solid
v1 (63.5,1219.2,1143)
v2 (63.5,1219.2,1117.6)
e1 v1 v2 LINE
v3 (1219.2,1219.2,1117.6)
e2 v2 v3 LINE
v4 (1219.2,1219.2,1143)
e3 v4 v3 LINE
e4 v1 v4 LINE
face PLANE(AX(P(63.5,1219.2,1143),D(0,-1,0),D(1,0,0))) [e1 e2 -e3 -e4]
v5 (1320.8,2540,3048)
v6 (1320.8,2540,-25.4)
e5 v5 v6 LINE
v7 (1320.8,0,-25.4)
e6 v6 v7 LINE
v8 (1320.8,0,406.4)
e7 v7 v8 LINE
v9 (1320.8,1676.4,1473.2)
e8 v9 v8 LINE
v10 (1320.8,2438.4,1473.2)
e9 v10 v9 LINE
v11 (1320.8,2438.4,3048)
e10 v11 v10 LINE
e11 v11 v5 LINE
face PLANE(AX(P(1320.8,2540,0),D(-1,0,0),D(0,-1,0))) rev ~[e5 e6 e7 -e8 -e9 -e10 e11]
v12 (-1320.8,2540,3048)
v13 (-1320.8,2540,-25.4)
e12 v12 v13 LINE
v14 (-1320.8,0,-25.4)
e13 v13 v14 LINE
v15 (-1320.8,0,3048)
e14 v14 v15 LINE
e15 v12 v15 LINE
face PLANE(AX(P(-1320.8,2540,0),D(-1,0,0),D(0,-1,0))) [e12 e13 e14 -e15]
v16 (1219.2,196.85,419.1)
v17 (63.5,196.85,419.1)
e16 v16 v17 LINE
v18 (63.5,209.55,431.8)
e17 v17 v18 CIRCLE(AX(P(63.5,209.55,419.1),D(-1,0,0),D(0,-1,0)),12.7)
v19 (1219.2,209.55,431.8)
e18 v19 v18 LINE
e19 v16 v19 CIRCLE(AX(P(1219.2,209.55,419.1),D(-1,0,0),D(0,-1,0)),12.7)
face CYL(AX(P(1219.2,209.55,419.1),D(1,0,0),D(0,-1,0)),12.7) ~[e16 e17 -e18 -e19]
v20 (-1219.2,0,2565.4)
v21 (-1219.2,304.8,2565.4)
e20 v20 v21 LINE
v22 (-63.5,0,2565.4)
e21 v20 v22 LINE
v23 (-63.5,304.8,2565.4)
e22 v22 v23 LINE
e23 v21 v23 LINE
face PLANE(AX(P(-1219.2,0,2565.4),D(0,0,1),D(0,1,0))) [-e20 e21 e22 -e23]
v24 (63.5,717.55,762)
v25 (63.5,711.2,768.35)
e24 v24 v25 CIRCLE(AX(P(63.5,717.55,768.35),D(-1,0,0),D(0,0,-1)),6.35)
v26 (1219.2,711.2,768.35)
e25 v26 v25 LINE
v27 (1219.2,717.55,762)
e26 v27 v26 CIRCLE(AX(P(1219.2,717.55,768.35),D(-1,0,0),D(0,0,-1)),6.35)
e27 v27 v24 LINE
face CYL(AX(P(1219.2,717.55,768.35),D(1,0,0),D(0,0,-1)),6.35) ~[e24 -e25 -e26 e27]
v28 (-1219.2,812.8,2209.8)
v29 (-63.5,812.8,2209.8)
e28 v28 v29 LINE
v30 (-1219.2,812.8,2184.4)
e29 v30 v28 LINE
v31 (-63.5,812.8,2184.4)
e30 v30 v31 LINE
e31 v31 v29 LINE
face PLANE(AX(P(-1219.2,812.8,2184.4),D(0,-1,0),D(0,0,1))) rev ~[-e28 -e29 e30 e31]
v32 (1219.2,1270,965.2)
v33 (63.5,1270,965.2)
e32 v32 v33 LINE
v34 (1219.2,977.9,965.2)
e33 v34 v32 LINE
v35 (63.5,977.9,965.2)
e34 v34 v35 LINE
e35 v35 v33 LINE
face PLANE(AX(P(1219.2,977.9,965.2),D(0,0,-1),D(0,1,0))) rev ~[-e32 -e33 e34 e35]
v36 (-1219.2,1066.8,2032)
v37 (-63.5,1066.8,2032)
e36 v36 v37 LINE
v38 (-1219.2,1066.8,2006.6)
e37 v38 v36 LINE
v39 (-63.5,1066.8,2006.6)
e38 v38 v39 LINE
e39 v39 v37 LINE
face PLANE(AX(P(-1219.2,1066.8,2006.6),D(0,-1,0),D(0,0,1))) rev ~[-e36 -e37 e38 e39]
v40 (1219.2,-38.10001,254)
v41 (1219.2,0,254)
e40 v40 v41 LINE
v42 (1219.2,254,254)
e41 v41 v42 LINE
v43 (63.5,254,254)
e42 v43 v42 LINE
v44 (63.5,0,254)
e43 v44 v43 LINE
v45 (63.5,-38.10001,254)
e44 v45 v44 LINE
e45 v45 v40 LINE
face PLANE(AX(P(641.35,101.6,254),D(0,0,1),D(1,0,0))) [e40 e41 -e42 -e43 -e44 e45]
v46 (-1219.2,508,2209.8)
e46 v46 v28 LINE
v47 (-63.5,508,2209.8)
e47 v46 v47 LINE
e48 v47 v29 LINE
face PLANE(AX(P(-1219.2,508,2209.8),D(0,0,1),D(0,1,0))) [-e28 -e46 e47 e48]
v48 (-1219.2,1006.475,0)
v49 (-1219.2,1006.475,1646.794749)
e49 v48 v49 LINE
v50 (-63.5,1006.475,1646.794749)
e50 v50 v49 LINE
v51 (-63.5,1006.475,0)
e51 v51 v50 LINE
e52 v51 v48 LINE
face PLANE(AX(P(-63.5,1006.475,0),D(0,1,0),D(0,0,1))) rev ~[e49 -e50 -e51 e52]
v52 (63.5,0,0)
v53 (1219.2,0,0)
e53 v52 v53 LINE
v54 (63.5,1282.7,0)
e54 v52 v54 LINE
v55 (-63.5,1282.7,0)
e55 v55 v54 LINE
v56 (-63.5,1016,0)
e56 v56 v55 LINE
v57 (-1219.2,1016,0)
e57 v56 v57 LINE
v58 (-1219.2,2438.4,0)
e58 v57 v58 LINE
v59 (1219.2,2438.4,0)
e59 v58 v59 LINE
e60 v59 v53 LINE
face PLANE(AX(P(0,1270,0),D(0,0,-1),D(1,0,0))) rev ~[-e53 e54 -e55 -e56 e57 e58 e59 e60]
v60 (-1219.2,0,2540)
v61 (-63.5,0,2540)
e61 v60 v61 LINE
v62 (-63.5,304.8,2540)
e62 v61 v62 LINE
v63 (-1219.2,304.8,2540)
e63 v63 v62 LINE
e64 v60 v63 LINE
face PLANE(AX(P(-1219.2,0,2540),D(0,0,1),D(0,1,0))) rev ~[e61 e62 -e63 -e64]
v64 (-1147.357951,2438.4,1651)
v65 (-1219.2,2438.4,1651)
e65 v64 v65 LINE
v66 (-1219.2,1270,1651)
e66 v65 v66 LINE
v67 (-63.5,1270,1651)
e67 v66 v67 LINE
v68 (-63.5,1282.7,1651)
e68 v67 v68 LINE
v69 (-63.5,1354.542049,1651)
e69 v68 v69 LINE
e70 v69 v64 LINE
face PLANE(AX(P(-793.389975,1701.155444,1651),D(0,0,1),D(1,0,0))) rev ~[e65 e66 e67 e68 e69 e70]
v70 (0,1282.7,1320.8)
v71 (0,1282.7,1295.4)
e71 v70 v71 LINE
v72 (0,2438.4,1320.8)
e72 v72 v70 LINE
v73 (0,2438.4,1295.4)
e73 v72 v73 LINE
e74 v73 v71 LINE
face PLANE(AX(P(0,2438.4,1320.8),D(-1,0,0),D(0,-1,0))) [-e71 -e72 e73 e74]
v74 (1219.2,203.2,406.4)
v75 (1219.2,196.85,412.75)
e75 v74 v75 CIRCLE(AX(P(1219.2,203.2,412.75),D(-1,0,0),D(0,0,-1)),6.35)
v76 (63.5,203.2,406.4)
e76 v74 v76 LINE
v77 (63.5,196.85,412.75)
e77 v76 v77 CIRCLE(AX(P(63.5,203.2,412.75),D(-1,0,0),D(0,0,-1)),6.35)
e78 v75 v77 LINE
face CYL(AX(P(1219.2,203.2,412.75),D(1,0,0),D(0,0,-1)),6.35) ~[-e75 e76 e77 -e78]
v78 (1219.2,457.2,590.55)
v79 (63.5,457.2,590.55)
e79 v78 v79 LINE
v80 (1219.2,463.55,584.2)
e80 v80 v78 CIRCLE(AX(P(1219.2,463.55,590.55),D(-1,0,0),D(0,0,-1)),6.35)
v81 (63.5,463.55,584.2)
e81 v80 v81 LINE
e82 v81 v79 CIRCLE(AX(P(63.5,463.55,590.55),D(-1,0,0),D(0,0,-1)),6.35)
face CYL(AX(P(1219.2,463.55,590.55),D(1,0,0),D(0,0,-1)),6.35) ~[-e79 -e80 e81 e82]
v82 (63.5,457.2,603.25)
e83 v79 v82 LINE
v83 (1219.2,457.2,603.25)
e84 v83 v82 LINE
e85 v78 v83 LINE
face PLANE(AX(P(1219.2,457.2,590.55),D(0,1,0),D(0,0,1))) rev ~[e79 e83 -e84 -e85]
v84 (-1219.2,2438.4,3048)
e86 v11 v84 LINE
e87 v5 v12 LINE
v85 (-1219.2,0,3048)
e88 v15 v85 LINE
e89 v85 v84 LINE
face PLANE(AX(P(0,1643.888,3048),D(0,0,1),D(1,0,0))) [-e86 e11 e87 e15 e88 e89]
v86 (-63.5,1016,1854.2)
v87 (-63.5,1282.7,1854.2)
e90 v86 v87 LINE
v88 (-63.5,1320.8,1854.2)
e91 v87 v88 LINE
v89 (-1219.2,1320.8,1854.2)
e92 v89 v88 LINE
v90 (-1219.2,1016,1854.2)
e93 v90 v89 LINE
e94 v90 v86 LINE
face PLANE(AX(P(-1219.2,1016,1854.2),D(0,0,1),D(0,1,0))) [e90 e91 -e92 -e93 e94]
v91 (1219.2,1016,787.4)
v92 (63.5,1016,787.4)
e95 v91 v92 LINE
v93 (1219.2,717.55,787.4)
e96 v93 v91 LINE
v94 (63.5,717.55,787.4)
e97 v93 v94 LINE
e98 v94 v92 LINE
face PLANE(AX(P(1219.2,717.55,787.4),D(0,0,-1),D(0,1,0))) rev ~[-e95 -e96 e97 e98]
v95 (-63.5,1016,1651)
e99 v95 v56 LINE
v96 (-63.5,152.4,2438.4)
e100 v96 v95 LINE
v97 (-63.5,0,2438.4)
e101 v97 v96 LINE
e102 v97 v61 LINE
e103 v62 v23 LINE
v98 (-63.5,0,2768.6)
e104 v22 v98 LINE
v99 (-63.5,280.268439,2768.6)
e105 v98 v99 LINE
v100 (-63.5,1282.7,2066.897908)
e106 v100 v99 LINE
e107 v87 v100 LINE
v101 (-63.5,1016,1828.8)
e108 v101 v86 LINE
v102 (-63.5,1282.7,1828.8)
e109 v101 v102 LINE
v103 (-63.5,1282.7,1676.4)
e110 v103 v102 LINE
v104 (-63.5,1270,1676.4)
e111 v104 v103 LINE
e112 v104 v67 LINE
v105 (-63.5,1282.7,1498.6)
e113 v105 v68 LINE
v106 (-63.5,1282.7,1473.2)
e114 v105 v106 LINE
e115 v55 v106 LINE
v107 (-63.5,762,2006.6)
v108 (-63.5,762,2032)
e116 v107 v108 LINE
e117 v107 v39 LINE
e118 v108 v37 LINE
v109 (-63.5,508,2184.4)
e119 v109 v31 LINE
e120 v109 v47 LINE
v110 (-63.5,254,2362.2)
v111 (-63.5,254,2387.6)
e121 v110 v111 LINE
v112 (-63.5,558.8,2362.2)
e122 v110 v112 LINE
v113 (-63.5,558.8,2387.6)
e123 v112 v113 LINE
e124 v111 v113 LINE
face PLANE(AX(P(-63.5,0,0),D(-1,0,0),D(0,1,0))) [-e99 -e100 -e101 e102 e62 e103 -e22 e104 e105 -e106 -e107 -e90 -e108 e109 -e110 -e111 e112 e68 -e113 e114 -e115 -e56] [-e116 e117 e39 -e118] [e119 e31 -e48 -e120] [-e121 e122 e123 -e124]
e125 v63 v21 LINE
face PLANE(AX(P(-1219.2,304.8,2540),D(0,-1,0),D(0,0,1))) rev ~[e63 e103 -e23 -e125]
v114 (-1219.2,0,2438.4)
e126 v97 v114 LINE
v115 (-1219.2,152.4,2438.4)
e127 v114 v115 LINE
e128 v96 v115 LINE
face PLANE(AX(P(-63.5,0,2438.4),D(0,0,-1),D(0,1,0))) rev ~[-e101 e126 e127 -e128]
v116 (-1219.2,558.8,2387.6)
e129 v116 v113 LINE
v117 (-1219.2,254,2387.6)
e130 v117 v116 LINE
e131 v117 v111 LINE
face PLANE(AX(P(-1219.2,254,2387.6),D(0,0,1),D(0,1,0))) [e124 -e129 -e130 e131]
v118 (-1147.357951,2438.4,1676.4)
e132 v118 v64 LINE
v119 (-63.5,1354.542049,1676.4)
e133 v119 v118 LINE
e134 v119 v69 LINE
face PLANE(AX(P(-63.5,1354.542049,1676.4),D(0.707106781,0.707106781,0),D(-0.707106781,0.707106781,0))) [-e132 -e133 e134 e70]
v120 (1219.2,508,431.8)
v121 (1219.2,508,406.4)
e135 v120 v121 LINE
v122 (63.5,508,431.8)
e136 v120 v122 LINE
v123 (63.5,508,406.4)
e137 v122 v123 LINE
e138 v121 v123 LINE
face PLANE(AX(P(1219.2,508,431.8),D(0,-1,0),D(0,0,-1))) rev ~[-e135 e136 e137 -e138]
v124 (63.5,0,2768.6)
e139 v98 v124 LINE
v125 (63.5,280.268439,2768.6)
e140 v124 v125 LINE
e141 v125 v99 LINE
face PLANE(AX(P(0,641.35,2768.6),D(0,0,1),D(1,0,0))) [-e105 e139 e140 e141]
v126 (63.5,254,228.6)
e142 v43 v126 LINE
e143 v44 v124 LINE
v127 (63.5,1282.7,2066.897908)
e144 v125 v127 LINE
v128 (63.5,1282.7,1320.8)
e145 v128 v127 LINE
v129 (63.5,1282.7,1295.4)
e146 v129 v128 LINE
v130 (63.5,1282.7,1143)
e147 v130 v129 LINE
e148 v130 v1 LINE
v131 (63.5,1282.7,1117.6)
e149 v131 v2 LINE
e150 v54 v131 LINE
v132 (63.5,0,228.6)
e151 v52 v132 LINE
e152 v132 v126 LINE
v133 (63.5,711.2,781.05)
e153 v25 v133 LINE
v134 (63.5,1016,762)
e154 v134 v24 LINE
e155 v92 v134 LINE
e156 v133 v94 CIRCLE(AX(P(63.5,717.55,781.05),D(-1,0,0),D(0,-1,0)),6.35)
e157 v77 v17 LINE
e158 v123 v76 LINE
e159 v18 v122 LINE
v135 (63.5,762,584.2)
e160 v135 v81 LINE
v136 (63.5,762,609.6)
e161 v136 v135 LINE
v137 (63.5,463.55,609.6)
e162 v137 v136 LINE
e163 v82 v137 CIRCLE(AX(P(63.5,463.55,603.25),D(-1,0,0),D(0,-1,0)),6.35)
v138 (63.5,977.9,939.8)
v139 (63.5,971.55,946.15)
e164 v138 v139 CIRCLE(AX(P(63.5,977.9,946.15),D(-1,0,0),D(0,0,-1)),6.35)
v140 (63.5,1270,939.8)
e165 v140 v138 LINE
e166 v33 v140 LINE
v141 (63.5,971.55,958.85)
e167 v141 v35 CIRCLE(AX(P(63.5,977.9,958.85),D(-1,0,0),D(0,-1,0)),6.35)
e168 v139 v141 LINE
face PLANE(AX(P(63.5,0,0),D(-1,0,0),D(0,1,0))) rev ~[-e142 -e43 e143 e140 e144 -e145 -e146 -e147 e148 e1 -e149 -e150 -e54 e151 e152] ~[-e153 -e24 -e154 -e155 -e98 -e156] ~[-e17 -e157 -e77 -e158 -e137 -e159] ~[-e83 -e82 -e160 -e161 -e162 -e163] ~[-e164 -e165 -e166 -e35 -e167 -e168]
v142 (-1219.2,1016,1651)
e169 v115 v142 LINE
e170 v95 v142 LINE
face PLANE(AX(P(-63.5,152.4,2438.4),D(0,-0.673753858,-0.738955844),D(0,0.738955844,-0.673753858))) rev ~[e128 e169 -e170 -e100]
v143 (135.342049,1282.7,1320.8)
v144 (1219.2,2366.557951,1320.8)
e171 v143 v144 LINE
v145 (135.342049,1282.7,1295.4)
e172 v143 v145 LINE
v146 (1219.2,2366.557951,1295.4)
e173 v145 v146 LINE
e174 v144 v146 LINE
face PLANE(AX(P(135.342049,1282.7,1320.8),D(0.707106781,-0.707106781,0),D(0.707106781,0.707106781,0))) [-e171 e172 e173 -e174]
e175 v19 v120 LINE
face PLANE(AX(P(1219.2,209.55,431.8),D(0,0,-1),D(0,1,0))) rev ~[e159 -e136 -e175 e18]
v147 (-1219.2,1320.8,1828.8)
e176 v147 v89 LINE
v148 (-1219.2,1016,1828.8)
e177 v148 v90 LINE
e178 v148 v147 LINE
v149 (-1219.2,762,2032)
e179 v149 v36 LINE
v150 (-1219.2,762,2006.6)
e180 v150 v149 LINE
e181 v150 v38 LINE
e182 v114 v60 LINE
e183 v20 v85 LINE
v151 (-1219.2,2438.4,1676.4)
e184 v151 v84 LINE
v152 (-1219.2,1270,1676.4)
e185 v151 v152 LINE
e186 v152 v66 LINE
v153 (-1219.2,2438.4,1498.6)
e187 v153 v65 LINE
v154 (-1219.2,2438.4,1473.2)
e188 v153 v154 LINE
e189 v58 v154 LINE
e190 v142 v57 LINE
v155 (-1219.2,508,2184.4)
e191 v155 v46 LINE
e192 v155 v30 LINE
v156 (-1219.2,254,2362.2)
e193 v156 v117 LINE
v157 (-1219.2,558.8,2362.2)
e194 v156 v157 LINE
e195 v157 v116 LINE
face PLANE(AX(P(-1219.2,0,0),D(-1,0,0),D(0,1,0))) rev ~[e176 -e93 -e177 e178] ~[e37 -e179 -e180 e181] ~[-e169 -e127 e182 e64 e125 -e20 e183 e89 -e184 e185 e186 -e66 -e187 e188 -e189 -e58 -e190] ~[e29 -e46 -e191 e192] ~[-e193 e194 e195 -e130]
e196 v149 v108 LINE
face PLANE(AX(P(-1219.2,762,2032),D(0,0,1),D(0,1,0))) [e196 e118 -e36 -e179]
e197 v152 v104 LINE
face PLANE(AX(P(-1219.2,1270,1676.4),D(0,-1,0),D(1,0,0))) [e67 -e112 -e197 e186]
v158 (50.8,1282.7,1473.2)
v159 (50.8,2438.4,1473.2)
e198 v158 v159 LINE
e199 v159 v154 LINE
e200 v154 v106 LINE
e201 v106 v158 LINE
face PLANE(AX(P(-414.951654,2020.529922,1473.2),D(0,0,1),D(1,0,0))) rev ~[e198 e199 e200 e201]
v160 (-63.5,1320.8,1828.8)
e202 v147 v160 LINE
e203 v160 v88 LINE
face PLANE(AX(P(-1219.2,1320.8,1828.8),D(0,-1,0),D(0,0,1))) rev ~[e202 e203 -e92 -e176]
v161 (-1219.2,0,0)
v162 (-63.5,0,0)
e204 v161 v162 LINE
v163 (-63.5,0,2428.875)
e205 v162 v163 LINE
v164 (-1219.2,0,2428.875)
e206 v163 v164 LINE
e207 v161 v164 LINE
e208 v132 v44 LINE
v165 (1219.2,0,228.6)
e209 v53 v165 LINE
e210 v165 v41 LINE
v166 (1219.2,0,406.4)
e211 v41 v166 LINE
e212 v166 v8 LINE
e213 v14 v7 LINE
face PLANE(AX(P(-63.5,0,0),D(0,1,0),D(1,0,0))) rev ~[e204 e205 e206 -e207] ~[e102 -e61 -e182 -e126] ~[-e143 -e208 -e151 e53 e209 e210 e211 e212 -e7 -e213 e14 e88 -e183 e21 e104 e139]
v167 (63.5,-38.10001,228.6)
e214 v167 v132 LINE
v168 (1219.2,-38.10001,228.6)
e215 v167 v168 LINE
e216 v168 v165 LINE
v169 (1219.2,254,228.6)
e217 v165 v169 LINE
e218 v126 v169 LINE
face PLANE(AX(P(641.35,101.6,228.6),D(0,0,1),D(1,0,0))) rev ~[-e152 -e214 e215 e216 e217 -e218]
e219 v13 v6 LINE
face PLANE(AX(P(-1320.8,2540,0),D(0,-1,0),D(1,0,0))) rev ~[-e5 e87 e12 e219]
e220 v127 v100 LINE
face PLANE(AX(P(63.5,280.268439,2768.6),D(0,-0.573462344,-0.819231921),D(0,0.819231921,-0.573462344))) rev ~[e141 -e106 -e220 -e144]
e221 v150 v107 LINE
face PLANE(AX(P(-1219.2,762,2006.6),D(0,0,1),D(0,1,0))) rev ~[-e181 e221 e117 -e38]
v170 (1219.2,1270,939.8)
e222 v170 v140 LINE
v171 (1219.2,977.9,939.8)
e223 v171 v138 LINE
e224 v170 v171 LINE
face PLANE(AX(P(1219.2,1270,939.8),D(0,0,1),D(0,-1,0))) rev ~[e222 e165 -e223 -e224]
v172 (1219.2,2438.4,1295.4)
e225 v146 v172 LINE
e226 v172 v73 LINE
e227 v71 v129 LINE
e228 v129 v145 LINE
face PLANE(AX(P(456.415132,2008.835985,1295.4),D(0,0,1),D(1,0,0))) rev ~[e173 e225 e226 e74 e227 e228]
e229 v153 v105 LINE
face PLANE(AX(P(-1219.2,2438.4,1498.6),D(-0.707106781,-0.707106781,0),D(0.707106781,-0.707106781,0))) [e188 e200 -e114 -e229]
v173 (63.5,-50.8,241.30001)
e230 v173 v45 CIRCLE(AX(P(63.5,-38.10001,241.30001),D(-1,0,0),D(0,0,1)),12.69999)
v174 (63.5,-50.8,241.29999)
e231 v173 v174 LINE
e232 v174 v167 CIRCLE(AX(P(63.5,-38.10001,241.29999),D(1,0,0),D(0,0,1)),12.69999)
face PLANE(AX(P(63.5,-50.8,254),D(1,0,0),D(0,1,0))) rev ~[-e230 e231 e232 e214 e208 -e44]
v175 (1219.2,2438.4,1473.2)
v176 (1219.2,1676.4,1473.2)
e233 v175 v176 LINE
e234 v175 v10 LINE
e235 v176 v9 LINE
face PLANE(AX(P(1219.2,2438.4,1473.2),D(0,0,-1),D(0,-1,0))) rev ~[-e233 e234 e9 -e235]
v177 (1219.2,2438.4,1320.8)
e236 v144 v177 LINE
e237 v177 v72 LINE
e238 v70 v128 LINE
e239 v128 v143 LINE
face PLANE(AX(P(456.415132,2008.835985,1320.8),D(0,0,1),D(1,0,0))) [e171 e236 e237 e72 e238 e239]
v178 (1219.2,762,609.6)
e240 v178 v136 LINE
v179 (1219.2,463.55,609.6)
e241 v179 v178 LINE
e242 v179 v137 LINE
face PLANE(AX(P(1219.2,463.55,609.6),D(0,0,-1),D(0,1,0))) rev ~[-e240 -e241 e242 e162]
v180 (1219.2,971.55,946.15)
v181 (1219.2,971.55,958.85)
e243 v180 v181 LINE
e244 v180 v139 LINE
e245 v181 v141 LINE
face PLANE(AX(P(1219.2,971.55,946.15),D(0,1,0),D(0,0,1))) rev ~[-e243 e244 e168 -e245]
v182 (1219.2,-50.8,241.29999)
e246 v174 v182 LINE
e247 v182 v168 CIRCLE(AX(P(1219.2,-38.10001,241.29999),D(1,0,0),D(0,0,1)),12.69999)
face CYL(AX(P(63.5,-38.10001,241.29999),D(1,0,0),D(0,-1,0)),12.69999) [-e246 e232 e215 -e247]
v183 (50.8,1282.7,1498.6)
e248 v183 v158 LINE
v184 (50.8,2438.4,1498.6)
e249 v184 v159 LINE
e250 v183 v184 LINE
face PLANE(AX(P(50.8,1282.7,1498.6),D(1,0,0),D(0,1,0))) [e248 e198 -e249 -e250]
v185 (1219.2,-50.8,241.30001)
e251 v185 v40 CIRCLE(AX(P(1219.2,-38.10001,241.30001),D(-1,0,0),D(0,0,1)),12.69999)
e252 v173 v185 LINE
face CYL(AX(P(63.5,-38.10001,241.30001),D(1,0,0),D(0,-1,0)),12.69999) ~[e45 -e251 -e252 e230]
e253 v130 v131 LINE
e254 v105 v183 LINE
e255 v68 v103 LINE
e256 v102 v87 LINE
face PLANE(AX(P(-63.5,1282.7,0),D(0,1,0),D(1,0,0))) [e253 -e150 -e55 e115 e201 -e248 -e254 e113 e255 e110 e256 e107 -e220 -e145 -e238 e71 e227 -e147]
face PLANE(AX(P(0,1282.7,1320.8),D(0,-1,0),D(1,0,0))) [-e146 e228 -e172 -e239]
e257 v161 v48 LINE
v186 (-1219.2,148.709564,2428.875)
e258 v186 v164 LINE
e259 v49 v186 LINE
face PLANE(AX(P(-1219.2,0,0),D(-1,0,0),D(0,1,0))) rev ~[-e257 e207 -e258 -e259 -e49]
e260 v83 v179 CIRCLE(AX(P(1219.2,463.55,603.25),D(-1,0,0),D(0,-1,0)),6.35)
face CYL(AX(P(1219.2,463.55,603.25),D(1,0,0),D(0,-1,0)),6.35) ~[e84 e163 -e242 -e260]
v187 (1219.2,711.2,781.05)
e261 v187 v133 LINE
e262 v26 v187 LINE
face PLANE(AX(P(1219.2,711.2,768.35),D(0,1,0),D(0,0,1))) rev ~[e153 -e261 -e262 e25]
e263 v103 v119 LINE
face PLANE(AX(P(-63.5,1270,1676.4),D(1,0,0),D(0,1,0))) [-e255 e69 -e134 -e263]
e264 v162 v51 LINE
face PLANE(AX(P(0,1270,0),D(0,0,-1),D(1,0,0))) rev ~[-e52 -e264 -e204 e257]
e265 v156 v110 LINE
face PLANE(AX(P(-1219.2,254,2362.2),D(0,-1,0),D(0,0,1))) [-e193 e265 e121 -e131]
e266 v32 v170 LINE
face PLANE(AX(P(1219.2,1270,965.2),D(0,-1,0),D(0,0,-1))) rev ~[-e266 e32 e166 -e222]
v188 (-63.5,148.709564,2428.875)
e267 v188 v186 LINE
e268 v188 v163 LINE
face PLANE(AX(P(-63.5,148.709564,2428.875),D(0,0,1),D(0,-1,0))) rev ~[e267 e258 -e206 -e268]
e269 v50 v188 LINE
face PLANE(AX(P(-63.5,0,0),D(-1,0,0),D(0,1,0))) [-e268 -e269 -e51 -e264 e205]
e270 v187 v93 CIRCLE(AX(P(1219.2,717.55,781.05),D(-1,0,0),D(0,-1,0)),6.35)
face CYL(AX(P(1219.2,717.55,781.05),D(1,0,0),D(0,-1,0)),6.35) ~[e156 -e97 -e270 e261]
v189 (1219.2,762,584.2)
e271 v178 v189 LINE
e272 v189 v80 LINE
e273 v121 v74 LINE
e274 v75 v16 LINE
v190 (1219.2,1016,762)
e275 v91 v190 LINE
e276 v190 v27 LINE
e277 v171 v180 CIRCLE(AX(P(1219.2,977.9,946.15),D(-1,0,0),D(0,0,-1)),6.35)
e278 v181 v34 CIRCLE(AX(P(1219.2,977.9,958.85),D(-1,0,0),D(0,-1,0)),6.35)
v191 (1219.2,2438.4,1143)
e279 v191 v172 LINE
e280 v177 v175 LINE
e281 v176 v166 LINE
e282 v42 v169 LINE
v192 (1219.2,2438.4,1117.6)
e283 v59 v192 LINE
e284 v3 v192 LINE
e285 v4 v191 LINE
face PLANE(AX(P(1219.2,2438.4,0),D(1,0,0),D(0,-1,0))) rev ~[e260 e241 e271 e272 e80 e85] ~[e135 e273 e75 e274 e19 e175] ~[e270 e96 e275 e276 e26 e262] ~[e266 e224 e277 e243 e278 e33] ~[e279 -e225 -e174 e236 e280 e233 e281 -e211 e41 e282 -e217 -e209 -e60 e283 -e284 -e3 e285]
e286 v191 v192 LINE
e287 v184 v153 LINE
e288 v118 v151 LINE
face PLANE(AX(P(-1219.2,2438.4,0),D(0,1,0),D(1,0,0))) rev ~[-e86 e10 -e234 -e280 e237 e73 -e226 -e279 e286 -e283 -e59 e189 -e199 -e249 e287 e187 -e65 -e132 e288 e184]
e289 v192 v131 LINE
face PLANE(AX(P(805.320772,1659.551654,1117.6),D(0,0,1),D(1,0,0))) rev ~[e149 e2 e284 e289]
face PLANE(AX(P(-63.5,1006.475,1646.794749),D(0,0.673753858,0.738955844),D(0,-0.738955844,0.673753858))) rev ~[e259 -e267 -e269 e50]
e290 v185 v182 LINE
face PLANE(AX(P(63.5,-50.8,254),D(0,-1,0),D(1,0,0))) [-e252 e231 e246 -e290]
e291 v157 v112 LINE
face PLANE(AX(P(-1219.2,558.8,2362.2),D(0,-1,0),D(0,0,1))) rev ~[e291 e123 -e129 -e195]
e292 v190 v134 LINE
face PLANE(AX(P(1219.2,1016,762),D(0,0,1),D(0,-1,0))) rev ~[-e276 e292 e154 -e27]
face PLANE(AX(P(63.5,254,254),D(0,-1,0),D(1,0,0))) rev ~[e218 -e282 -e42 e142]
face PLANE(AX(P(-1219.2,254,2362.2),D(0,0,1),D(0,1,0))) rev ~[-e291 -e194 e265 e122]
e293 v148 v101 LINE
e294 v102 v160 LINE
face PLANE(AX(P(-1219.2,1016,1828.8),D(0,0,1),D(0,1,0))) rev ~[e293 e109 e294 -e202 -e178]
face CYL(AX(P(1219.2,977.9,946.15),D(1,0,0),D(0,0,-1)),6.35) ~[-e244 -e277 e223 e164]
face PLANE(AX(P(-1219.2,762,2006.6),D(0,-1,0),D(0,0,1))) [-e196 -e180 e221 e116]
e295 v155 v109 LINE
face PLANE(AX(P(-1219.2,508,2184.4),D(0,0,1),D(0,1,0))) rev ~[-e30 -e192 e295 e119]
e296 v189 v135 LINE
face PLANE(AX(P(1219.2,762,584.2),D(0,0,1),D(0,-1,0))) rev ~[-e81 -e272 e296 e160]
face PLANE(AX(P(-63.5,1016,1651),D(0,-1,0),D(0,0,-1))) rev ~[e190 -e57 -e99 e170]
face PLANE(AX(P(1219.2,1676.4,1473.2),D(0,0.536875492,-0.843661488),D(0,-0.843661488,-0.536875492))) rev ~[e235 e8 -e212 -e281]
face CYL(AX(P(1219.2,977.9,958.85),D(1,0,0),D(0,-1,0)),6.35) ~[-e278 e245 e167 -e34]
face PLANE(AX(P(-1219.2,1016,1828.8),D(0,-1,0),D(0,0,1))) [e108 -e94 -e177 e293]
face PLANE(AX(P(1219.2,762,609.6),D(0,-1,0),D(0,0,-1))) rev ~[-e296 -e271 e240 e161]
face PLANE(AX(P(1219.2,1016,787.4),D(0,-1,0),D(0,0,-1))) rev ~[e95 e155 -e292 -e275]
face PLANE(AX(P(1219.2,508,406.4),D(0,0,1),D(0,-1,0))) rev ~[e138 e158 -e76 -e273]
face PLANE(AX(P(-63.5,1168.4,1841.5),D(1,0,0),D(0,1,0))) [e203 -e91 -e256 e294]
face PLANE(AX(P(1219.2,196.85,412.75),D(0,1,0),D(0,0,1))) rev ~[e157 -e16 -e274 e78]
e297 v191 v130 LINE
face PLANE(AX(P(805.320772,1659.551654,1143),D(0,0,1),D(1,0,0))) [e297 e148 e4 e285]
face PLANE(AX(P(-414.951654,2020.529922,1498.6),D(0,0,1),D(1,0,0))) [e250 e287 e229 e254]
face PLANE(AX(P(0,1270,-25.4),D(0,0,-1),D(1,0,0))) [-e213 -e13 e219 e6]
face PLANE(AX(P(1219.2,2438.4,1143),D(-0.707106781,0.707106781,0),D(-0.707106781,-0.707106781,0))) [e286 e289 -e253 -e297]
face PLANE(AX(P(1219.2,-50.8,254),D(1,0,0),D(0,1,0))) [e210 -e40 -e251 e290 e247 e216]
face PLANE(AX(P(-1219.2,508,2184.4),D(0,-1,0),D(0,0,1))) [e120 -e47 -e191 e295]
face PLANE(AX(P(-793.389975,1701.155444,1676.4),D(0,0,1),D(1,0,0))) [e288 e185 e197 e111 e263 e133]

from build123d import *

# Parameters (mm, degrees)
F2_DEPTH  = 3048
F4_W      = 1155.7
F4_H      = 304.8
F5_DEPTH  = 25.4
F6_R      = 12.69999
F8_DEPTH  = 1155.7
F11_DEPTH = 25.4
F14_DEPTH = 25.4
F17_DEPTH = 25.4
F20_DEPTH = 25.4
F21_W     = 304.8
F21_H     = 25.4
F22_DEPTH = 1155.7
F24_W     = 2641.6
F24_H     = 2540
F25_DEPTH = 25.4
F23_W     = 127
F23_H     = 1282.7
F26_DEPTH = 2768.6
F28_DEPTH = 101.601
F30_DEPTH = 152.4
F32_DEPTH = 1155.7


# Not quite as in the source:
# - a fillet or chamfer is up to 0.001 mm smaller than in the source, because OpenCascade refuses the exact size


with BuildPart() as f2:
    # F1 (on Top) → F2 (new body)
    with BuildSketch(Plane.XY):
        Polygon((-1320.8, 0), (-1219.2, 0), (-1219.2, 2438.4), (1219.2, 2438.4), (1219.2, 0), (1320.8, 0), (1320.8, 2540), (-1320.8, 2540), align=None)
    extrude(amount=F2_DEPTH)

    # F4 (on offset) → F5 (join)
    with BuildSketch(Plane.XY.offset(254)):
        with Locations((641.35, 101.6)):
            Rectangle(F4_W, F4_H)
    extrude(amount=-F5_DEPTH)

    # F6 (radius 12.7 in the source; OpenCascade refuses exactly that, so slightly less here)
    f6_edges = [f2.edges().sort_by_distance(p)[0] for p in [
        (641.35, -50.8, 254),
        (641.35, -50.8, 228.6),
    ]]
    fillet(f6_edges, radius=F6_R)

    # F7 (on face) → F8 (join, through all)
    with BuildSketch(Plane(origin=(1219.2, 0, 0), x_dir=(0, -1, 0), z_dir=(-1, 0, 0))):
        with BuildLine():
            Line((-717.55, 787.4), (-1016, 787.4))
            Line((-1016, 787.4), (-1016, 762))
            Line((-1016, 762), (-717.55, 762))
            ThreePointArc((-717.55, 762), (-713.0598719395, 763.8598719395), (-711.2, 768.35))
            Line((-711.2, 768.35), (-711.2, 781.05))
            ThreePointArc((-711.2, 781.05), (-713.0598719395, 785.5401280605), (-717.55, 787.4))
        make_face()
        with BuildLine():
            Line((-463.55, 609.6), (-762, 609.6))
            Line((-762, 609.6), (-762, 584.2))
            Line((-762, 584.2), (-463.55, 584.2))
            ThreePointArc((-463.55, 584.2), (-459.0598719395, 586.0598719395), (-457.2, 590.55))
            Line((-457.2, 590.55), (-457.2, 603.25))
            ThreePointArc((-457.2, 603.25), (-459.0598719395, 607.7401280605), (-463.55, 609.6))
        make_face()
        with BuildLine():
            Line((-209.55, 431.8), (-508, 431.8))
            Line((-508, 431.8), (-508, 406.4))
            Line((-508, 406.4), (-203.2, 406.4))
            ThreePointArc((-203.2, 406.4), (-198.7098719395, 408.2598719395), (-196.85, 412.75))
            Line((-196.85, 412.75), (-196.85, 419.1))
            ThreePointArc((-196.85, 419.1), (-200.5697438789, 428.0802561211), (-209.55, 431.8))
        make_face()
        with BuildLine():
            Line((-1270, 939.8), (-977.9, 939.8))
            ThreePointArc((-977.9, 939.8), (-973.4098719395, 941.6598719395), (-971.55, 946.15))
            Line((-971.55, 946.15), (-971.55, 958.85))
            ThreePointArc((-971.55, 958.85), (-973.4098719395, 963.3401280605), (-977.9, 965.2))
            Line((-977.9, 965.2), (-1270, 965.2))
            Line((-1270, 965.2), (-1270, 939.8))
        make_face()
    extrude(amount=F8_DEPTH)

    # F10 (on offset) → F11 (join)
    with BuildSketch(Plane.XY.offset(1143)):
        Polygon((1219.2, 2438.4), (63.5, 1282.7), (63.5, 1219.2), (1219.2, 1219.2), align=None)
    extrude(amount=-F11_DEPTH)

    # F13 (on offset) → F14 (join)
    with BuildSketch(Plane.XY.offset(1320.8)):
        Polygon((0, 2438.4), (0, 1282.7), (135.3420489686, 1282.7), (1219.2, 2366.5579510314), (1219.2, 2438.4), align=None)
    extrude(amount=-F14_DEPTH)

    # F16 (on offset) → F17 (join)
    with BuildSketch(Plane.XY.offset(1498.6)):
        Polygon((-1219.2, 2438.4), (-63.5, 1282.7), (50.8, 1282.7), (50.8, 2438.4), align=None)
    extrude(amount=-F17_DEPTH)

    # F19 (on offset) → F20 (join)
    with BuildSketch(Plane.XY.offset(1676.4)):
        Polygon((-1219.2, 2438.4), (-1219.2, 1270), (-63.5, 1270), (-63.5, 1354.5420489686), (-1147.3579510314, 2438.4), align=None)
    extrude(amount=-F20_DEPTH)

    # F21 (on face) → F22 (join)
    with BuildSketch(Plane.YZ.offset(-1219.2)):
        with Locations((1168.4, 1841.5)):
            Rectangle(F21_W, F21_H)
        with Locations((914.4, 2019.3)):
            Rectangle(F21_W, F21_H)
        with Locations((660.4, 2197.1)):
            Rectangle(F21_W, F21_H)
        with Locations((406.4, 2374.9)):
            Rectangle(F21_W, F21_H)
        with Locations((152.4, 2552.7)):
            Rectangle(F21_W, F21_H)
    extrude(amount=F22_DEPTH)

    # F24 (on face) → F25 (join)
    with BuildSketch(Plane(origin=(0, 0, 0), x_dir=(1, 0, 0), z_dir=(0, 0, -1))):
        with Locations((0, -1270)):
            Rectangle(F24_W, F24_H)
    extrude(amount=F25_DEPTH)

    # F23 (on Top) → F26 (join)
    with BuildSketch(Plane.XY):
        with Locations((0, 641.35)):
            Rectangle(F23_W, F23_H)
    extrude(amount=F26_DEPTH)

    # F27 (on face) → F28 (cut, through all)
    with BuildSketch(Plane(origin=(1219.2, 0, 0), x_dir=(0, -1, 0), z_dir=(-1, 0, 0))):
        Polygon((-1676.4, 1473.2), (0, 406.4), (0, 3048), (-2438.4, 3048), (-2438.4, 1473.2), align=None)
    extrude(amount=-F28_DEPTH, mode=Mode.SUBTRACT)

    # F29 (on face) → F30 (cut)
    with BuildSketch(Plane.YZ.offset(63.5)):
        Polygon((1282.7, 2768.6), (280.2684394054, 2768.6), (1282.7, 2066.8979075838), align=None)
    extrude(amount=-F30_DEPTH, mode=Mode.SUBTRACT)

    # F31 (on face) → F32 (join, through all)
    with BuildSketch(Plane(origin=(-63.5, 0, 0), x_dir=(0, -1, 0), z_dir=(-1, 0, 0))):
        Polygon((-152.4, 2438.4), (-1016, 1651), (-1016, 0), (-1006.475, 0), (-1006.475, 1646.7947494006), (-148.7095638587, 2428.875), (0, 2428.875), (0, 2438.4), align=None)
    extrude(amount=F32_DEPTH)


solid = f2.part
